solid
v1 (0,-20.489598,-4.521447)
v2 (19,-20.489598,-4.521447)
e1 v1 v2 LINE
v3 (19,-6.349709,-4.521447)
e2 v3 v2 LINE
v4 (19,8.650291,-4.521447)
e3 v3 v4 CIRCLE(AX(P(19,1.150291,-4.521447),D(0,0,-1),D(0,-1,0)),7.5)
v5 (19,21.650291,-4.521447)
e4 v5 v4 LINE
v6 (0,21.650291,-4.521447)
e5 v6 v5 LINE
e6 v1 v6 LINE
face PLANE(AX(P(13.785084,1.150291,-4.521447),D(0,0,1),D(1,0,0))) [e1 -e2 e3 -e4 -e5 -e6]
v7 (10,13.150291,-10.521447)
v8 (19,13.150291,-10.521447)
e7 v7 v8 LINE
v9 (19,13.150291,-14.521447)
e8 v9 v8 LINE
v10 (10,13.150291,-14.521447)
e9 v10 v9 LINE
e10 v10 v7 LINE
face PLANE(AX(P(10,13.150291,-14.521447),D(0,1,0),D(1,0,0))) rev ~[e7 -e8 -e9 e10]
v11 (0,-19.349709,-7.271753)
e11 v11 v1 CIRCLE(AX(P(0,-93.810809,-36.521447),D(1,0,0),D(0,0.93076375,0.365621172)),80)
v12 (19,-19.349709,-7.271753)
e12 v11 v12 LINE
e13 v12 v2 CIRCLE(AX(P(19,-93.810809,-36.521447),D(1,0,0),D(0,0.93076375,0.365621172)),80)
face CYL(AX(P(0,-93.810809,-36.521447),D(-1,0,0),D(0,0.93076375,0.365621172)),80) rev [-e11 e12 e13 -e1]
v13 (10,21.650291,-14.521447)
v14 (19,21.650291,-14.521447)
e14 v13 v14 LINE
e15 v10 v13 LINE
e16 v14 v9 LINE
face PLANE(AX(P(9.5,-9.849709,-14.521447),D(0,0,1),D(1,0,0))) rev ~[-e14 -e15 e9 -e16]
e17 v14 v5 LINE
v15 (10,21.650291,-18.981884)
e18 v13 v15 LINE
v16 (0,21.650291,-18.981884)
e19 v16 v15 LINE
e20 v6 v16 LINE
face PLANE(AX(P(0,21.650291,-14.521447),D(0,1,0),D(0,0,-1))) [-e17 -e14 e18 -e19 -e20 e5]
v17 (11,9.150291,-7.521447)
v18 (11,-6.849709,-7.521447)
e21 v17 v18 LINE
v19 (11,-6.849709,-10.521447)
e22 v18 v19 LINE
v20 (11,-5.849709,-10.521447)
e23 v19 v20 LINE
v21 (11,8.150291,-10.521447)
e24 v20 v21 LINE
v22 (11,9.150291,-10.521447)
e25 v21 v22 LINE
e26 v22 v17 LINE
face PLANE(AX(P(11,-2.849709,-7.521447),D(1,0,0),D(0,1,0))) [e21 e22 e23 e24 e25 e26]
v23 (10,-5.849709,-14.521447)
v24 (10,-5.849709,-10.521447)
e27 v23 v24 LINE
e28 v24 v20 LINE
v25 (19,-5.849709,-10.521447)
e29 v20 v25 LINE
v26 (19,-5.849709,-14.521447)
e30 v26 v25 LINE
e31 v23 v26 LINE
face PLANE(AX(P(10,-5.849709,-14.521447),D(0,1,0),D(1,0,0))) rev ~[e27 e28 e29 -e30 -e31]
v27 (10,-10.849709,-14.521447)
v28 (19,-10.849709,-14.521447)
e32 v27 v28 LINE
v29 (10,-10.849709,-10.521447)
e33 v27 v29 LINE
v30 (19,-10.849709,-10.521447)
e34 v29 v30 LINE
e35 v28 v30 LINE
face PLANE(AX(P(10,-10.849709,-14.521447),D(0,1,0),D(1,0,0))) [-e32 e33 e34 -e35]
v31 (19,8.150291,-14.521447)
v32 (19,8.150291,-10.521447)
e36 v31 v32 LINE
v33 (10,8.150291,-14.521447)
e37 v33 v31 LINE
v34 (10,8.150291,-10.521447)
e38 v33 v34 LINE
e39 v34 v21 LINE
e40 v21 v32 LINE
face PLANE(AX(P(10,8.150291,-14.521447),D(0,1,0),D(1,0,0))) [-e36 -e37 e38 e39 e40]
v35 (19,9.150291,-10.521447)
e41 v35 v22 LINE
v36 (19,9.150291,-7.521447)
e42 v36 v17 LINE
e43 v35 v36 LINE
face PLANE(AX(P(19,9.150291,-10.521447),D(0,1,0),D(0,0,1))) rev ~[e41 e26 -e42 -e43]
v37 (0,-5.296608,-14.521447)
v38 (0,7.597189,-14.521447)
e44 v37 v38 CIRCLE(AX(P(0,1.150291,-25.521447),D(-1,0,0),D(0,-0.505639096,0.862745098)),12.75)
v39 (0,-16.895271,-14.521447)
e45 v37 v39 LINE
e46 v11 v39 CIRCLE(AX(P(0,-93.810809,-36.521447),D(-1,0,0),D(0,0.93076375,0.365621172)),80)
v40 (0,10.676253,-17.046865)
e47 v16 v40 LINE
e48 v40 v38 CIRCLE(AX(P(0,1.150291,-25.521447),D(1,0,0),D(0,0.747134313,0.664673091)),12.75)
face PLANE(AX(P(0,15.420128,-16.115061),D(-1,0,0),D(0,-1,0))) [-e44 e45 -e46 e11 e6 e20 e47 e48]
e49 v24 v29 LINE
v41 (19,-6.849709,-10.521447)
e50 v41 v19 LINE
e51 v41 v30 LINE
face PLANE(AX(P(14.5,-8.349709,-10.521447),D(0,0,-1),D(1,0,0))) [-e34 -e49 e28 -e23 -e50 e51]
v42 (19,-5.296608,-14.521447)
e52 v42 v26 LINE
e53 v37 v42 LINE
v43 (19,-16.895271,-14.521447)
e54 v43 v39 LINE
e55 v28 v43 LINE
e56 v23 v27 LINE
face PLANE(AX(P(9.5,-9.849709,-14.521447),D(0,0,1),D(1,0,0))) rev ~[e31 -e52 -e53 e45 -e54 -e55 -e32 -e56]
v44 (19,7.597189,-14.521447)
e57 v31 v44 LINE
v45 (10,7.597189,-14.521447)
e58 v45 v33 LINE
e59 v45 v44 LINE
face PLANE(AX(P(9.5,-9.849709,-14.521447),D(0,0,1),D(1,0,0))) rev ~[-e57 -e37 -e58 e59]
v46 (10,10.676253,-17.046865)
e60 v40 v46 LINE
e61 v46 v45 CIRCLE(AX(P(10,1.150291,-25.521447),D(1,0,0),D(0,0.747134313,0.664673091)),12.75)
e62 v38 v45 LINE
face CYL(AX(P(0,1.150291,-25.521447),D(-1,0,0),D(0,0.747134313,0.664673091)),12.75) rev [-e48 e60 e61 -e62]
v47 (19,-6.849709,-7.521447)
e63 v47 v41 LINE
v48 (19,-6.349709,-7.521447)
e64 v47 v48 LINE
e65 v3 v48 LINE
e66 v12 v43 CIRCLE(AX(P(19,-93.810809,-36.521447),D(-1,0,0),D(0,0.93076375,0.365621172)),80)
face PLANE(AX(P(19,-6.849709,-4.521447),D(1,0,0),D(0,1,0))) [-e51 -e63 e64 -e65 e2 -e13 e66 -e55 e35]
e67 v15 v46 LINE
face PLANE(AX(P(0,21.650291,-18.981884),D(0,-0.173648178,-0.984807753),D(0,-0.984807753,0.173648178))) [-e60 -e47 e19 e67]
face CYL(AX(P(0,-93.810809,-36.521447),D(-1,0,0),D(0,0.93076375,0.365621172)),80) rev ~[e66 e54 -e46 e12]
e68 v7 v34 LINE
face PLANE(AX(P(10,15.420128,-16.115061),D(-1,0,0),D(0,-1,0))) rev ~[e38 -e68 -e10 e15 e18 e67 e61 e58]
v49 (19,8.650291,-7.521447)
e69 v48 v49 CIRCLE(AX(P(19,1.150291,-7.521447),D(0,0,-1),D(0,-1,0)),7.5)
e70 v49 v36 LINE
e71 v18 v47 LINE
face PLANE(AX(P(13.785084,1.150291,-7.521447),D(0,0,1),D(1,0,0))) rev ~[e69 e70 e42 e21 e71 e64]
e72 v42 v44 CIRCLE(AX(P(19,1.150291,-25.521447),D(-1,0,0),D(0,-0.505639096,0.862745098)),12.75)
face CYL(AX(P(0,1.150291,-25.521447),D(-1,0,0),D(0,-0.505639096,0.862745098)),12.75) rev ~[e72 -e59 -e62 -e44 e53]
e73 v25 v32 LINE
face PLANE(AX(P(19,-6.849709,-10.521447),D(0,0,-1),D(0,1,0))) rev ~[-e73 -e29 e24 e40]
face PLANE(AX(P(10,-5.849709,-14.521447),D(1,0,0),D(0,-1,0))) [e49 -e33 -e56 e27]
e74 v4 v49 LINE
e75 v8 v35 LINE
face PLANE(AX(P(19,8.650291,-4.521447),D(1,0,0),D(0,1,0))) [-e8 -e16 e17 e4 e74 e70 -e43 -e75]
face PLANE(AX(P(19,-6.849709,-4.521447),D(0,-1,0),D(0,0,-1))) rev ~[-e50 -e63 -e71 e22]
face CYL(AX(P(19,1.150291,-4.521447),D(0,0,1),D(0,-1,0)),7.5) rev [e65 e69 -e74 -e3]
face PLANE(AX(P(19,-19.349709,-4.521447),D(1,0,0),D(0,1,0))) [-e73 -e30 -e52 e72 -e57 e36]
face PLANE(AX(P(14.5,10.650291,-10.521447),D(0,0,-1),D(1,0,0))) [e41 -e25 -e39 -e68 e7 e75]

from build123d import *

# Parameters (mm, degrees)
F0_W      = 22
F0_H      = 10
F1_DEPTH  = 19
F2_W      = 19
F2_H      = 19
F3_DEPTH  = 10
F4_W      = 9
F4_H      = 5
F5_DEPTH  = 4
F7_DEPTH  = 25
F9_DEPTH  = 19
F10_DEPTH = 25
F12_DEPTH = 10
F14_DEPTH = 8
F16_DEPTH = 3


# Not quite as in the source:
# - a feature names something its author has since deleted; it is built from what else it names


with BuildPart() as f1:
    # F0 (on Right) → F1 (new body)
    with BuildSketch(Plane.YZ):
        with Locations((10.6502909437, -9.5214466426)):
            Rectangle(F0_W, F0_H)
    extrude(amount=F1_DEPTH)

    # F2 (on face) → F3 (join)
    with BuildSketch(Plane.XY.offset(-4.5214466426)):
        with Locations((9.5, -9.8497090563)):
            Rectangle(F2_W, F2_H)
    extrude(amount=-F3_DEPTH)

    # F4 (on face) → F5 (cut)
    with BuildSketch(Plane(origin=(0, 0, -14.5214466426), x_dir=(1, 0, 0), z_dir=(0, 0, -1))):
        with Locations((14.5, 8.3497090563)):
            Rectangle(F4_W, F4_H)
        with Locations((14.5, -10.6502909437)):
            Rectangle(F4_W, F4_H)
    extrude(amount=-F5_DEPTH, mode=Mode.SUBTRACT)

    # F6 (on face) → F7 (cut)
    with BuildSketch(Plane(origin=(0, 0, 0), x_dir=(0, -1, 0), z_dir=(-1, 0, 0))):
        with BuildLine():
            Line((-7.5971894228, -14.5214466426), (5.2966075354, -14.5214466426))
            ThreePointArc((5.2966075354, -14.5214466426), (-1.1502909437, -12.7714466426), (-7.5971894228, -14.5214466426))
        make_face()
        with BuildLine():
            ThreePointArc((-7.5971894228, -14.5214466426), (-7.4892397679, -36.5840063737), (11.5997090563, -25.5214466426))
            ThreePointArc((11.5997090563, -25.5214466426), (9.9122687874, -19.1824978184), (5.2966075354, -14.5214466426))
            Line((5.2966075354, -14.5214466426), (-7.5971894228, -14.5214466426))
        make_face()
    extrude(amount=-F7_DEPTH, mode=Mode.SUBTRACT)

    # F8 (on face) → F9 (join)
    with BuildSketch(Plane(origin=(0, 0, 0), x_dir=(0, -1, 0), z_dir=(-1, 0, 0))):
        with BuildLine():
            ThreePointArc((19.3497090563, -7.2717528529), (78.9260517523, -115.1245254627), (173.8108090563, -36.5214466426))
            ThreePointArc((173.8108090563, -36.5214466426), (110.1555805515, 41.7910583919), (20.489597937, -4.5214466426))
            Line((20.489597937, -4.5214466426), (33.1326909363, -4.5214466426))
            Line((33.1326909363, -4.5214466426), (33.1326909363, -14.5214466426))
            Line((33.1326909363, -14.5214466426), (19.3497090563, -14.5214466426))
            Line((19.3497090563, -14.5214466426), (19.3497090563, -7.2717528529))
        make_face()
        with BuildLine():
            ThreePointArc((19.3497090563, -7.2717528529), (19.9068584447, -5.8912967246), (20.489597937, -4.5214466426))
            Line((20.489597937, -4.5214466426), (19.3497090563, -4.5214466426))
            Line((19.3497090563, -4.5214466426), (19.3497090563, -7.2717528529))
        make_face()
    extrude(amount=-F9_DEPTH)

    # F8 (on face) → F10 (cut)
    with BuildSketch(Plane(origin=(0, 0, 0), x_dir=(0, -1, 0), z_dir=(-1, 0, 0))):
        with BuildLine():
            ThreePointArc((19.3497090563, -7.2717528529), (78.9260517523, -115.1245254627), (173.8108090563, -36.5214466426))
            ThreePointArc((173.8108090563, -36.5214466426), (110.1555805515, 41.7910583919), (20.489597937, -4.5214466426))
            Line((20.489597937, -4.5214466426), (33.1326909363, -4.5214466426))
            Line((33.1326909363, -4.5214466426), (33.1326909363, -14.5214466426))
            Line((33.1326909363, -14.5214466426), (19.3497090563, -14.5214466426))
            Line((19.3497090563, -14.5214466426), (19.3497090563, -7.2717528529))
        make_face()
    extrude(amount=-F10_DEPTH, mode=Mode.SUBTRACT)

    # F11 (on face) → F12 (join)
    with BuildSketch(Plane(origin=(0, 0, 0), x_dir=(0, -1, 0), z_dir=(-1, 0, 0))):
        with BuildLine():
            ThreePointArc((-10.6762534344, -17.046864728), (-9.2359267268, -15.6632016678), (-7.5971894228, -14.5214466426))
            Line((-7.5971894228, -14.5214466426), (-21.6502909437, -14.5214466426))
            Line((-21.6502909437, -14.5214466426), (-21.6502909437, -18.9818836282))
            Line((-21.6502909437, -18.9818836282), (-10.6762534344, -17.046864728))
        make_face()
    extrude(amount=-F12_DEPTH)

    # F13 (on face) → F14 (cut)
    with BuildSketch(Plane.YZ.offset(19)):
        Polygon((1.1502909437, -4.5214466426), (-6.8497090563, -4.5214466426), (-6.8497090563, -10.5214466426), (-5.8497090563, -10.5214466426), (1.1502909437, -10.5214466426), align=None)
        Polygon((9.1502909437, -4.5214466426), (1.1502909437, -4.5214466426), (1.1502909437, -10.5214466426), (8.1502909437, -10.5214466426), (9.1502909437, -10.5214466426), align=None)
    extrude(amount=-F14_DEPTH, mode=Mode.SUBTRACT)

    # F15 (on face) → F16 (join)
    with BuildSketch(Plane.XY.offset(-4.5214466426)):
        with BuildLine():
            ThreePointArc((19, -6.3497090563), (11.5, 1.1502909437), (19, 8.6502909437))
            Line((19, 8.6502909437), (19, 9.1502909437))
            Line((19, 9.1502909437), (11, 9.1502909437))
            Line((11, 9.1502909437), (11, -6.8497090563))
            Line((11, -6.8497090563), (19, -6.8497090563))
            Line((19, -6.8497090563), (19, -6.3497090563))
        make_face()
    extrude(amount=-F16_DEPTH)


solid = f1.part
